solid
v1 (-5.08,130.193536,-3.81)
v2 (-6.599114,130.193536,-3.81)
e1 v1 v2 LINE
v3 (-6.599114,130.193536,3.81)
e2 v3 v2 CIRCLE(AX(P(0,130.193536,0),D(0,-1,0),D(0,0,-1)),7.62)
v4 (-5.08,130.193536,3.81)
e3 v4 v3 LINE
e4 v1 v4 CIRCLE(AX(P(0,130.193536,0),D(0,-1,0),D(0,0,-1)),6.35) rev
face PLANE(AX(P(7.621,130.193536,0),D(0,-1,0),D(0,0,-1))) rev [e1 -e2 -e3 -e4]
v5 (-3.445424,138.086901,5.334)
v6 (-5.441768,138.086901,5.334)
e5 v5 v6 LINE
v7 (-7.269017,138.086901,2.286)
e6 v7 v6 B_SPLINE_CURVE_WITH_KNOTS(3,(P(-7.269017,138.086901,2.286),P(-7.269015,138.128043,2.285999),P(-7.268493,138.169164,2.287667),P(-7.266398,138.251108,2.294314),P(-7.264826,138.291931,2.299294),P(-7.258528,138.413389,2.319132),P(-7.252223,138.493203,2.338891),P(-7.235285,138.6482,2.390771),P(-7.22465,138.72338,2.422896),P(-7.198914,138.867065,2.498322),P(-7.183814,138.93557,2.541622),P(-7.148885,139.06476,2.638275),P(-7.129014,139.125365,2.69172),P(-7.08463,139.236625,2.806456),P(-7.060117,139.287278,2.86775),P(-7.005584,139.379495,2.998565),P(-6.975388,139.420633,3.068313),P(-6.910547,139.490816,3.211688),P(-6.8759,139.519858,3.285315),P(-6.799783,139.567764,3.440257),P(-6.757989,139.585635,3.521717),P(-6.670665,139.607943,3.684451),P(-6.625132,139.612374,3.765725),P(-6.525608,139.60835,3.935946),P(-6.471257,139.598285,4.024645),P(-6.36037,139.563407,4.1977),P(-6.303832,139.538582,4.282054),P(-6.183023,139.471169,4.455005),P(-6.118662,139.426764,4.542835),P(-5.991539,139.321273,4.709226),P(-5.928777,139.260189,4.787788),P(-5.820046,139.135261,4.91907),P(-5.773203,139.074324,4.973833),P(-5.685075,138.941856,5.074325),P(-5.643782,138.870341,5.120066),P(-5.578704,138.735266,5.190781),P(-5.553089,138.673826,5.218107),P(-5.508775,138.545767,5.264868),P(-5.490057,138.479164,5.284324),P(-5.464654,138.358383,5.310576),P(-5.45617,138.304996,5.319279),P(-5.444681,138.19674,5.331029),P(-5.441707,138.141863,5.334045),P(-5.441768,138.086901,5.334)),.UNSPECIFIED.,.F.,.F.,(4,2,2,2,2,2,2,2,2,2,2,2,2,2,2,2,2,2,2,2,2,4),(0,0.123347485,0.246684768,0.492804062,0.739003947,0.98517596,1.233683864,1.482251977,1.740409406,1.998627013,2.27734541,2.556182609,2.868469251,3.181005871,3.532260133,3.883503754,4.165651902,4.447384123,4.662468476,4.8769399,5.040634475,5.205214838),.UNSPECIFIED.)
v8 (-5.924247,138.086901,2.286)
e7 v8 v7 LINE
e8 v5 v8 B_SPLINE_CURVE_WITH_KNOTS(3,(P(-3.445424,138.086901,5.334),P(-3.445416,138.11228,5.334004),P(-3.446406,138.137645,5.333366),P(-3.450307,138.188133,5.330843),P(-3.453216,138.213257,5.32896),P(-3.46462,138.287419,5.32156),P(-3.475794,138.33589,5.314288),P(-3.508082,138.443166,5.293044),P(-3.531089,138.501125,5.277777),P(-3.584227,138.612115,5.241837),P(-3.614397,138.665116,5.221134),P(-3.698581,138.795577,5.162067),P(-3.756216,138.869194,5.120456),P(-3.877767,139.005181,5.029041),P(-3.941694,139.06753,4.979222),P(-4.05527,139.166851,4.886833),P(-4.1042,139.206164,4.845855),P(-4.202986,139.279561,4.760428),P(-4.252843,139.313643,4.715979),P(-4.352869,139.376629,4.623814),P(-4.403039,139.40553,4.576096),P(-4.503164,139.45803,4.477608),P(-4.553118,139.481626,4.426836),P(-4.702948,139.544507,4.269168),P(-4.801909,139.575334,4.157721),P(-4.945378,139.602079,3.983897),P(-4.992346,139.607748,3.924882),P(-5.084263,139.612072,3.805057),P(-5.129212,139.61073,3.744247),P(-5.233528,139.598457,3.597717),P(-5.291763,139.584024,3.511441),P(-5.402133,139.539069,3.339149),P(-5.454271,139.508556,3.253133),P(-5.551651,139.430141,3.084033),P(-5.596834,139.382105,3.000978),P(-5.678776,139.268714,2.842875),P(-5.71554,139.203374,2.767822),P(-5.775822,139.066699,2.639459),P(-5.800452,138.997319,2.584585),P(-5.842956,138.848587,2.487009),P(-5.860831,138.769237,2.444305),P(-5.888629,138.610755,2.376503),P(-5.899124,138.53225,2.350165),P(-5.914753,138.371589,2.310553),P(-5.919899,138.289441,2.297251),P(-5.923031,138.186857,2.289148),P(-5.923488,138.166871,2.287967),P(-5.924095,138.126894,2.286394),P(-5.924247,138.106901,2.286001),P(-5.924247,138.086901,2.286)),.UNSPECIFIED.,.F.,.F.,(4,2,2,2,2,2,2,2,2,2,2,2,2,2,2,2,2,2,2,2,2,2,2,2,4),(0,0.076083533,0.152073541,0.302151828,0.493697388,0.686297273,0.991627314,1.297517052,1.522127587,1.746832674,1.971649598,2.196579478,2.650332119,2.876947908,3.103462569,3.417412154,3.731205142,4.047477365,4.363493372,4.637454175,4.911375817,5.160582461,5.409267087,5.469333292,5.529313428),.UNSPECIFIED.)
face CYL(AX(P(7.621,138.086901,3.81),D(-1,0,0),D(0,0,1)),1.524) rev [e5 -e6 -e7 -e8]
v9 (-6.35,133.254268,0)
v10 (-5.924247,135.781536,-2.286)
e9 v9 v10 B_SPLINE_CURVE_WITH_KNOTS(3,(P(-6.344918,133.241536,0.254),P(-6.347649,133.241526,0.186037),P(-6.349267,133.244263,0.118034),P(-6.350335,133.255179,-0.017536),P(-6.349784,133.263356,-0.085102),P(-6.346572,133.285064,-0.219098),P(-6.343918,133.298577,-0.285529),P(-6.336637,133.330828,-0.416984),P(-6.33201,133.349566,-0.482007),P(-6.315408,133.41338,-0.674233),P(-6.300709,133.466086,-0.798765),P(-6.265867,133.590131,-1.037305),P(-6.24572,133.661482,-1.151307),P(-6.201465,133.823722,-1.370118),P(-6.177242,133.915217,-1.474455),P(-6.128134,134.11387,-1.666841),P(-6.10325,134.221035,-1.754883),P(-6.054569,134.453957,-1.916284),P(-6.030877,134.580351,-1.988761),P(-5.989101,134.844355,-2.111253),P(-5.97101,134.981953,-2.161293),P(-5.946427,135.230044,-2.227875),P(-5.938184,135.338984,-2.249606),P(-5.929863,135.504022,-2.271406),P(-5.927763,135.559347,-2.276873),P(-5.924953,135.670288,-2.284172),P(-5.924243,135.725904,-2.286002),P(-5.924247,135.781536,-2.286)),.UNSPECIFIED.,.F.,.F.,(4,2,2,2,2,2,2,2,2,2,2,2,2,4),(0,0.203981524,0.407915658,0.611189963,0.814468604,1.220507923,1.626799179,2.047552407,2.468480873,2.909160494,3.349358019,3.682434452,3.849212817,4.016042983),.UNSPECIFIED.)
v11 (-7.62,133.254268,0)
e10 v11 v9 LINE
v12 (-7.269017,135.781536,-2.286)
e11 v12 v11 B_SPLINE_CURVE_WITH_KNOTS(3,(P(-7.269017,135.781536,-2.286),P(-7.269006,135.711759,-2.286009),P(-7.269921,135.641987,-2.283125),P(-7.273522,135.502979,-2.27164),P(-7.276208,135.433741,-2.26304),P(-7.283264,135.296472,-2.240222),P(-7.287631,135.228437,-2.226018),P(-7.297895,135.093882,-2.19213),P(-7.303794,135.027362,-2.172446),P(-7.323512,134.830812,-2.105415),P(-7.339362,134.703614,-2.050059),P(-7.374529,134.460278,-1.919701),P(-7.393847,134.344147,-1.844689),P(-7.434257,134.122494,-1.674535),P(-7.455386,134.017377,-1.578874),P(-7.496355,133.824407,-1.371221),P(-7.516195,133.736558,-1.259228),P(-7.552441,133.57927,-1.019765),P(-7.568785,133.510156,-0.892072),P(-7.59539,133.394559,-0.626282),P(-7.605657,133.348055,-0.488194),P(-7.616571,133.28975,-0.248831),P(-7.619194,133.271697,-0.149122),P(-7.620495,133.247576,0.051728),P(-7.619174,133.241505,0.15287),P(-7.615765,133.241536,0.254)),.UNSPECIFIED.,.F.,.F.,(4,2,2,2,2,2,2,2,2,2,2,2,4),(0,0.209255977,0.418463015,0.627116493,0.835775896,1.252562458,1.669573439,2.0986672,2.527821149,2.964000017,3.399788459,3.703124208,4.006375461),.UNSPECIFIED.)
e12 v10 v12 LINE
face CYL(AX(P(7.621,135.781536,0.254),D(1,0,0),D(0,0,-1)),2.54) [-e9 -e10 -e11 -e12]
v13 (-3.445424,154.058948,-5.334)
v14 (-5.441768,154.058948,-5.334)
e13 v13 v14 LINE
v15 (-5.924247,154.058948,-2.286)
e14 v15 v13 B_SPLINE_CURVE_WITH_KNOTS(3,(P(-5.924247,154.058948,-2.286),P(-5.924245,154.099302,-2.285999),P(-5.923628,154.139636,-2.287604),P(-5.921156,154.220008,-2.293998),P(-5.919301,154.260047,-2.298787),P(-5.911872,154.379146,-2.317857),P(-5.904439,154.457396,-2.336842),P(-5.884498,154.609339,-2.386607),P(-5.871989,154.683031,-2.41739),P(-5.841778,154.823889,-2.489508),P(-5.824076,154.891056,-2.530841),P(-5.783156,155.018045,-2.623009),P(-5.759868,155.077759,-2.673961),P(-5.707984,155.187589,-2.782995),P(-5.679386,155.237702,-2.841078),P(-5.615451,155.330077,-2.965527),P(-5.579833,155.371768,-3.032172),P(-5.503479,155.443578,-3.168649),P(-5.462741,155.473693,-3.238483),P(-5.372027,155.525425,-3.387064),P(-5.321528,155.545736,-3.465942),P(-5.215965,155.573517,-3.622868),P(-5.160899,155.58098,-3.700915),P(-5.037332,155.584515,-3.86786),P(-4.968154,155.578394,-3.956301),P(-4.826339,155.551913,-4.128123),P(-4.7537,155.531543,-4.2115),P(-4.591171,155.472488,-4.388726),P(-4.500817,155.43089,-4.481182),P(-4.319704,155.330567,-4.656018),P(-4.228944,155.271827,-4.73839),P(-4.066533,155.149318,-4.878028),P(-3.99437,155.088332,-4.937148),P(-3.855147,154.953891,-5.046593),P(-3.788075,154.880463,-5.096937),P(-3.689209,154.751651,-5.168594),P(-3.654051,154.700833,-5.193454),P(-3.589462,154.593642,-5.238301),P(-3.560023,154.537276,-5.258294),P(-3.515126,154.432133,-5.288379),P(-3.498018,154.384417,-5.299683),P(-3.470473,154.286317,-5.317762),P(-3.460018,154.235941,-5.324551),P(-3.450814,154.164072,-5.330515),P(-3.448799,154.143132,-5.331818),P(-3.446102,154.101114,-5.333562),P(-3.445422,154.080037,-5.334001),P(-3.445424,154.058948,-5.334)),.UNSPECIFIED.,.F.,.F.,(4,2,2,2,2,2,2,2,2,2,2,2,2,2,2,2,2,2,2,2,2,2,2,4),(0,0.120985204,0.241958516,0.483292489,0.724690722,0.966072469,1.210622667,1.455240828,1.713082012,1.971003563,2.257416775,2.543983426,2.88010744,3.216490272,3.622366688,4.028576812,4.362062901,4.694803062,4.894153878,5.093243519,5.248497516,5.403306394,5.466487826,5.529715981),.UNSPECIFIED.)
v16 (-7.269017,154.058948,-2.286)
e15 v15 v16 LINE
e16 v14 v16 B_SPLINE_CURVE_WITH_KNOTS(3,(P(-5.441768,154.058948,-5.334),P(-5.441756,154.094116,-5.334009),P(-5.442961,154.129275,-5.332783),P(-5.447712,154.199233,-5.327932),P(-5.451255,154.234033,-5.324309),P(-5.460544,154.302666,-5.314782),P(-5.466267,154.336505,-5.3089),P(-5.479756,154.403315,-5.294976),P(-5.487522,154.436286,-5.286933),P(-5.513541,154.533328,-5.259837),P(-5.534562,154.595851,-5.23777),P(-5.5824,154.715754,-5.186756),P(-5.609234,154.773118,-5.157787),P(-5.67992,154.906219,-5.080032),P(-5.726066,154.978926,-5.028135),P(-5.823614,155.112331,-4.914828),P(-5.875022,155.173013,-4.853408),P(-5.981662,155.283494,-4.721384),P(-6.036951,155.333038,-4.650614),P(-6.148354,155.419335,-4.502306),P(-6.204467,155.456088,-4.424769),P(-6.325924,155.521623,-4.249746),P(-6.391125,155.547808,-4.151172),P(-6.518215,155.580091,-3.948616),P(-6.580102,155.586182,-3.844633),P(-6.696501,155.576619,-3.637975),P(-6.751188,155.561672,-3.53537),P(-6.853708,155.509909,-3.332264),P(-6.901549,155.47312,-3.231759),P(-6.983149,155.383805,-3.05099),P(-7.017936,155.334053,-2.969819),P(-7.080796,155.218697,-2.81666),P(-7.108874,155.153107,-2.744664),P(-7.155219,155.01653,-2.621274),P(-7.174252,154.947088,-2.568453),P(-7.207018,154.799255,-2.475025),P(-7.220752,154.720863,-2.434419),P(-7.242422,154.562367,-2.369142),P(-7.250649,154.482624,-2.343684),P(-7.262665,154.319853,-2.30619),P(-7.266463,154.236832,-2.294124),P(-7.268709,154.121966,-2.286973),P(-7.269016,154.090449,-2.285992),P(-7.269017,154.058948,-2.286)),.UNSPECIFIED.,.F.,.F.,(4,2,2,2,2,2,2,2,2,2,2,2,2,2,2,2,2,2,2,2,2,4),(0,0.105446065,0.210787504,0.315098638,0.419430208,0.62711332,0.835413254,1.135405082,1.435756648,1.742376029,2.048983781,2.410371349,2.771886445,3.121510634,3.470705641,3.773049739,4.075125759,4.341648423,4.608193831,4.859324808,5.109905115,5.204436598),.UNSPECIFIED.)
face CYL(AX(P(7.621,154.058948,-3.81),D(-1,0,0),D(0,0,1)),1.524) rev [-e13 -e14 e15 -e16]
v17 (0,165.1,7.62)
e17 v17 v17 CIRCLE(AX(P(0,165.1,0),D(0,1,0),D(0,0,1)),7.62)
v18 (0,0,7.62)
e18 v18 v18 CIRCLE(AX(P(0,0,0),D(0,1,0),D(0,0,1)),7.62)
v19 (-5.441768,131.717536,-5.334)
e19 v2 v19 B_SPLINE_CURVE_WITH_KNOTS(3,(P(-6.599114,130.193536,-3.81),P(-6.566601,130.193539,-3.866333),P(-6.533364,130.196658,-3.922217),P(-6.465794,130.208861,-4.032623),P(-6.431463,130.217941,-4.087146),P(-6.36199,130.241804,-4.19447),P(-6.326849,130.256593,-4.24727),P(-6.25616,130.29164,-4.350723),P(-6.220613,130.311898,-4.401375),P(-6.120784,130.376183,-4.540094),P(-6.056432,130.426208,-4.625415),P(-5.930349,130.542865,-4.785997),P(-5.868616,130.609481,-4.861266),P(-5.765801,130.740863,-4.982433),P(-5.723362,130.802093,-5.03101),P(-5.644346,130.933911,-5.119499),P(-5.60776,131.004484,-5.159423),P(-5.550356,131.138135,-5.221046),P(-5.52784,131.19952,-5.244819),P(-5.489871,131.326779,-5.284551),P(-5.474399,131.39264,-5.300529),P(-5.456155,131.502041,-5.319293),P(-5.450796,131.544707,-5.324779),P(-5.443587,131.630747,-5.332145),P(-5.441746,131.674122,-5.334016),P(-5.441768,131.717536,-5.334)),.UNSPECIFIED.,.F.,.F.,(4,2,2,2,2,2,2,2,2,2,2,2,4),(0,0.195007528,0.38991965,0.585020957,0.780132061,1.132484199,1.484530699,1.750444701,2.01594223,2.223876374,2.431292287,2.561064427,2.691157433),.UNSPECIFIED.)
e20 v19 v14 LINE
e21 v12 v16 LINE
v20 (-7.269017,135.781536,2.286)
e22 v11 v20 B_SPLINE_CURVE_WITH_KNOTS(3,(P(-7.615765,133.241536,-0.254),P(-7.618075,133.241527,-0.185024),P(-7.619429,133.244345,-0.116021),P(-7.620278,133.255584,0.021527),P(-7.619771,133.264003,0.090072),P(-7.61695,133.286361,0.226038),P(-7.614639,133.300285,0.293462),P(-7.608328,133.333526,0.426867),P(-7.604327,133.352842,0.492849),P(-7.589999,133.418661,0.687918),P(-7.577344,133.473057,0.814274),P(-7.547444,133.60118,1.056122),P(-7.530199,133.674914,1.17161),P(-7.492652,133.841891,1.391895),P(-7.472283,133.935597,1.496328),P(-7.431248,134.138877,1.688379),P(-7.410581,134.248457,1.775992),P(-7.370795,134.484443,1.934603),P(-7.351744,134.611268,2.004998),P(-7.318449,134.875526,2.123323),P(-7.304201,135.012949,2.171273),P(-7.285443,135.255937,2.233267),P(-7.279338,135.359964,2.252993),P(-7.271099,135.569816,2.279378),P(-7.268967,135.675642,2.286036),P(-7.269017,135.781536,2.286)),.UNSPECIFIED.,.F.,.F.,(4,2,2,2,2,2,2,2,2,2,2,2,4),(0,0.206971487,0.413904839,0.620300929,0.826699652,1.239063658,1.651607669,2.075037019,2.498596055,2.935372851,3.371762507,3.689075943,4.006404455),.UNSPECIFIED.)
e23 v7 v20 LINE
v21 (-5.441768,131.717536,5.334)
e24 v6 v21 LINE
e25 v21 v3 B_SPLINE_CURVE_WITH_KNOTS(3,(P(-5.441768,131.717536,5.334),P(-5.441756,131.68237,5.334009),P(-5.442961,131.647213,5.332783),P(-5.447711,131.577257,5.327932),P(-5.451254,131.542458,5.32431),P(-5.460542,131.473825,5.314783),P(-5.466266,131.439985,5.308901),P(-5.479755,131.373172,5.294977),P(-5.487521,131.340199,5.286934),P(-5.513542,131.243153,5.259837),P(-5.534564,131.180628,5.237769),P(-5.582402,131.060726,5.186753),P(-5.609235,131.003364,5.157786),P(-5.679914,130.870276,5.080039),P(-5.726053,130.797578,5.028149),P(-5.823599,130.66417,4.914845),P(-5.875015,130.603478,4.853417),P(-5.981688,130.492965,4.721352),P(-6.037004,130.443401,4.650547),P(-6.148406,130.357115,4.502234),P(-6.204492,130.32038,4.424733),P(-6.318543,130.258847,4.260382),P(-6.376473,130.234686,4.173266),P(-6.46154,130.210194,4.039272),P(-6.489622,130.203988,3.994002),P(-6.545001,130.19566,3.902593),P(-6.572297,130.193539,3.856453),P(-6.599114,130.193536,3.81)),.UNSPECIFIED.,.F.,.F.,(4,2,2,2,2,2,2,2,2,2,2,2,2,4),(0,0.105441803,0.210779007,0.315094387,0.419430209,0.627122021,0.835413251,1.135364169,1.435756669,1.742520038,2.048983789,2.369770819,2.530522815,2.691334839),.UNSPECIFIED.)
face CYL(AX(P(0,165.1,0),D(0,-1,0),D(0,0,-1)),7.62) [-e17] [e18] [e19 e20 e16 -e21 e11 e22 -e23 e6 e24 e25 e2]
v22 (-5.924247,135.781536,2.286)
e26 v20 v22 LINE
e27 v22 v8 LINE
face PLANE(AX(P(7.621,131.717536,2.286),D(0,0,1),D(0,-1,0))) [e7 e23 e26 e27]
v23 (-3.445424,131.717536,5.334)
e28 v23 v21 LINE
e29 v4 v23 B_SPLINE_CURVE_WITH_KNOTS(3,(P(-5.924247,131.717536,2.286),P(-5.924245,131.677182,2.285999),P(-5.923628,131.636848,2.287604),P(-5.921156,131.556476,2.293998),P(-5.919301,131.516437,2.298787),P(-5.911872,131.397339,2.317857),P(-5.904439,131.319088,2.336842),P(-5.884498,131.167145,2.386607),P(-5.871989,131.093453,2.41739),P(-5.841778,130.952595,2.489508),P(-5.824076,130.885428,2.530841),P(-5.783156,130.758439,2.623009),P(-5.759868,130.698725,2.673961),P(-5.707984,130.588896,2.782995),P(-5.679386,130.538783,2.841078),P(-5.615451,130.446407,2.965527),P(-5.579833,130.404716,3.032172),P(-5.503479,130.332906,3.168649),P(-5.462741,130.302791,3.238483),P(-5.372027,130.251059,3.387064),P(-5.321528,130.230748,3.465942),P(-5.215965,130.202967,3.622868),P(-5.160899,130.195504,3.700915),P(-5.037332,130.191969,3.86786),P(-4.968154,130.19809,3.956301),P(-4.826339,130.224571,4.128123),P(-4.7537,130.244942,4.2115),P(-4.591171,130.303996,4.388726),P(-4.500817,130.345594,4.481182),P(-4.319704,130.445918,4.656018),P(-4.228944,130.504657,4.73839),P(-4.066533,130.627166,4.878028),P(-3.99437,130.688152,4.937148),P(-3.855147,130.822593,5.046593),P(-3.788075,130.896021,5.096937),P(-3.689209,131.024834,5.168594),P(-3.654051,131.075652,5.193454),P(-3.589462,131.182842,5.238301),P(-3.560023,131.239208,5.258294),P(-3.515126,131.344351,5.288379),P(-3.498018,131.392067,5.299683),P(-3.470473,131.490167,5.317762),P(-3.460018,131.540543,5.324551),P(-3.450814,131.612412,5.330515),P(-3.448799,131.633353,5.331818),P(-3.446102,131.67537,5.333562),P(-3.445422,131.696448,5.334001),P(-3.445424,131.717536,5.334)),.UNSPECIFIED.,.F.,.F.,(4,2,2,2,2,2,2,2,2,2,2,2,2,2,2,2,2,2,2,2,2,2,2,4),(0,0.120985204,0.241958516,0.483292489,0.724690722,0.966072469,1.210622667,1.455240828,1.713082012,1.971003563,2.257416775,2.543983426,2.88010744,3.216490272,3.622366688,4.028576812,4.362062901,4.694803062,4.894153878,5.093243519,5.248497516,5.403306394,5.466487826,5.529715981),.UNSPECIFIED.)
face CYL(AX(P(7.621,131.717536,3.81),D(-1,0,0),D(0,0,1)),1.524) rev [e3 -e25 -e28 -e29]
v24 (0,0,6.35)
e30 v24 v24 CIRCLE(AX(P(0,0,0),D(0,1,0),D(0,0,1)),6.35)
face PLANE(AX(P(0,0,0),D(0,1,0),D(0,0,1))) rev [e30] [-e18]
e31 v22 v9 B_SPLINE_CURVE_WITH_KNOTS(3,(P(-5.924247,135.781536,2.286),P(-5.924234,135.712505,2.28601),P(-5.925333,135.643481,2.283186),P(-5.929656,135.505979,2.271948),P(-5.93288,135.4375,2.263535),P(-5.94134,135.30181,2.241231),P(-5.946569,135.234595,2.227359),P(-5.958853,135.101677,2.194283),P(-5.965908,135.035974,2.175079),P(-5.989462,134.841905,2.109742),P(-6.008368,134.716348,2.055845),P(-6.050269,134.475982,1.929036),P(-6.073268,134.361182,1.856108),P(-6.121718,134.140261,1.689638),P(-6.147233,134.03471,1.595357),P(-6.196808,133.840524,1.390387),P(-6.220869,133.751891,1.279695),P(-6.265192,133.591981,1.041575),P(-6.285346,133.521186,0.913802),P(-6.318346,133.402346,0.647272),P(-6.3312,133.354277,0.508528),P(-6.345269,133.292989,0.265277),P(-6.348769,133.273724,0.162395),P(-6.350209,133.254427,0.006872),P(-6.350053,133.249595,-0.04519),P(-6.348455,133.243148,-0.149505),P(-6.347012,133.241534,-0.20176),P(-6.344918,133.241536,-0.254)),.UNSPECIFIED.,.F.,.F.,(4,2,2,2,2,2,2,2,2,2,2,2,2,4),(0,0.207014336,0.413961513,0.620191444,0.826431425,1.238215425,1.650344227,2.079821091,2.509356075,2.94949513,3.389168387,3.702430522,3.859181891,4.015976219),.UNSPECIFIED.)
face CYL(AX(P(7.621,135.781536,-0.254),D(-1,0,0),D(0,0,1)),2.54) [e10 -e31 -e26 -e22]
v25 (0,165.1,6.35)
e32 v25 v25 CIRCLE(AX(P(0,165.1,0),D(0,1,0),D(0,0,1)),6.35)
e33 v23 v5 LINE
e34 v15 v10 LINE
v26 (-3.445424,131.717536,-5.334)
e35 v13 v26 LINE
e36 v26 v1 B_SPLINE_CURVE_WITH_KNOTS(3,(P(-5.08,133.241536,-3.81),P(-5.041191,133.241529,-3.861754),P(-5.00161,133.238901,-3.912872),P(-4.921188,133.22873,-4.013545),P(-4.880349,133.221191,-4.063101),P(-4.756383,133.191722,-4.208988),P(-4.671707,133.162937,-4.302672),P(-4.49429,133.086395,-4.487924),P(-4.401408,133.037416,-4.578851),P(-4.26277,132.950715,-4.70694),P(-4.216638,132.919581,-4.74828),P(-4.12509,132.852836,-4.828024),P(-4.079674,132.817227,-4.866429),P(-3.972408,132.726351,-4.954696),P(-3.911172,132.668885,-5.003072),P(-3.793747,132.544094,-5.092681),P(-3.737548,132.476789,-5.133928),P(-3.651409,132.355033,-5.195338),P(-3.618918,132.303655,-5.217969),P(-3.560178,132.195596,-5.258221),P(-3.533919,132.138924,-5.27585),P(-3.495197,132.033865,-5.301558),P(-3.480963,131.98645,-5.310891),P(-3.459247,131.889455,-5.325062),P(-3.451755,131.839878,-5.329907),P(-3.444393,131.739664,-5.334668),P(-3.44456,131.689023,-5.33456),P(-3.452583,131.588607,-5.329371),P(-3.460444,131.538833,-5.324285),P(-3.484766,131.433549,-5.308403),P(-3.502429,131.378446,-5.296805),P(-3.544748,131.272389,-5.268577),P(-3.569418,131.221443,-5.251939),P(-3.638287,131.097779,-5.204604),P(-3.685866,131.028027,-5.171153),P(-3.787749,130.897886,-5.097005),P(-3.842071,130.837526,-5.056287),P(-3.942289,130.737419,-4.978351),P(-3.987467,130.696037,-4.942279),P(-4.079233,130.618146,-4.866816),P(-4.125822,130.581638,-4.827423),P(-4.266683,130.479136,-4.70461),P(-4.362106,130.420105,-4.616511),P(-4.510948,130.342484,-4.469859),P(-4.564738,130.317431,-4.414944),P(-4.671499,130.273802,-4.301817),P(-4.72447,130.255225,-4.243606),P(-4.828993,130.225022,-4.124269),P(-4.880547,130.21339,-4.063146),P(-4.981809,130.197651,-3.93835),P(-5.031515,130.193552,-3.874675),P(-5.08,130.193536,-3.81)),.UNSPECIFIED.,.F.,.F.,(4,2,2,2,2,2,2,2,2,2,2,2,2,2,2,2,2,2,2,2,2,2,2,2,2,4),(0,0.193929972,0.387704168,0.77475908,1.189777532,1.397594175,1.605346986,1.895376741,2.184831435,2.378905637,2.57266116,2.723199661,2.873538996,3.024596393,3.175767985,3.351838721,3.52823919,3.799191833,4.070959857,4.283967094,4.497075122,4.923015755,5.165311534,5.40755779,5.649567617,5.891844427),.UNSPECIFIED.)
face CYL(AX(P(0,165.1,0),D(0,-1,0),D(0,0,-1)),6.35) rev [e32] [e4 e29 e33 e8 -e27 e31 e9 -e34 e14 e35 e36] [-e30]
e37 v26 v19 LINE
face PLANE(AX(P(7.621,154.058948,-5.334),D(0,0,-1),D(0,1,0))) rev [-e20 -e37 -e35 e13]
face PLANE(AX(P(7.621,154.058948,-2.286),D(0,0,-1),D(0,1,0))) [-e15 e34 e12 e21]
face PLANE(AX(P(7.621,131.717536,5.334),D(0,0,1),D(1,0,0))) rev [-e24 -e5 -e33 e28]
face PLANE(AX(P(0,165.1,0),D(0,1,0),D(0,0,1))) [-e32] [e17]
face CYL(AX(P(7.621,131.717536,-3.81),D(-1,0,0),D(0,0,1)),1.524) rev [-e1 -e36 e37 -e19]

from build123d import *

# Parameters (mm, degrees)
SKETCH1_R               = 7.62
SKETCH1_R_2             = 6.35
BOSS_EXTRUDE1_DEPTH     = 165.1
CUT_EXTRUDE1_REACH      = 167.977
CUT_EXTRUDE1_END_RADIUS = 6.35
FILLET3_R               = 2.54


with BuildPart() as part:
    # Sketch1 → Boss-Extrude1 (new body)
    with BuildSketch(Plane(origin=(0, 0, 0), x_dir=(1, 0, 0), z_dir=(0, 1, 0))):
        with Locations(Location((0, 0, 0), (0, 0, 270))):
            Circle(SKETCH1_R)
        with Locations(Location((0, 0, 0), (0, 0, 270))):
            Circle(SKETCH1_R_2, mode=Mode.SUBTRACT)
    extrude(amount=BOSS_EXTRUDE1_DEPTH)

    # Cut-Extrude1: up to this cylinder (the profile starts outside it)
    cut_extrude1_end = Plane(origin=(0, 137.302889, 0), z_dir=(0, -1, 0)) * Cylinder(CUT_EXTRUDE1_END_RADIUS, 360.824706, mode=Mode.PRIVATE)
    # Sketch2 → Cut-Extrude1 (cut, up to the surface)
    with BuildSketch(Plane.ZY.offset(7.62), mode=Mode.PRIVATE) as cut_extrude1_sk1:
        with BuildLine():
            Line((-2.286, 154.058948498), (-2.286, 131.717535749))
            ThreePointArc((-2.286, 131.717535749), (-3.81, 130.193535749), (-5.334, 131.717535749))
            Line((-5.334, 131.717535749), (-5.334, 154.058948498))
            ThreePointArc((-5.334, 154.058948498), (-3.81, 155.582948498), (-2.286, 154.058948498))
        make_face()
    cut_extrude1_tool1 = extrude(cut_extrude1_sk1.sketch, amount=-CUT_EXTRUDE1_REACH, mode=Mode.PRIVATE) - cut_extrude1_end
    add(cut_extrude1_tool1.solids().sort_by_distance((-7.62, 142.888242, -3.81))[0], mode=Mode.SUBTRACT)
    # Sketch2 → Cut-Extrude1 (cut, up to the surface)
    with BuildSketch(Plane.ZY.offset(7.62), mode=Mode.PRIVATE) as cut_extrude1_sk2:
        with BuildLine():
            Line((2.286, 131.717535749), (2.286, 138.086901397))
            ThreePointArc((2.286, 138.086901397), (3.81, 139.610901397), (5.334, 138.086901397))
            Line((5.334, 138.086901397), (5.334, 131.717535749))
            ThreePointArc((5.334, 131.717535749), (3.81, 130.193535749), (2.286, 131.717535749))
        make_face()
    cut_extrude1_tool2 = extrude(cut_extrude1_sk2.sketch, amount=-CUT_EXTRUDE1_REACH, mode=Mode.PRIVATE) - cut_extrude1_end
    add(cut_extrude1_tool2.solids().sort_by_distance((-7.62, 134.902219, 3.81))[0], mode=Mode.SUBTRACT)
    # Sketch2 → Cut-Extrude1 (cut, up to the surface)
    with BuildSketch(Plane.ZY.offset(7.62), mode=Mode.PRIVATE) as cut_extrude1_sk3:
        with BuildLine():
            Line((-3.81, 133.241535749), (3.81, 133.241535749))
            ThreePointArc((3.81, 133.241535749), (5.334, 131.717535749), (3.81, 130.193535749))
            Line((3.81, 130.193535749), (-3.81, 130.193535749))
            ThreePointArc((-3.81, 130.193535749), (-5.334, 131.717535749), (-3.81, 133.241535749))
        make_face()
    cut_extrude1_tool3 = extrude(cut_extrude1_sk3.sketch, amount=-CUT_EXTRUDE1_REACH, mode=Mode.PRIVATE) - cut_extrude1_end
    add(cut_extrude1_tool3.solids().sort_by_distance((-7.62, 131.717536, 0))[0], mode=Mode.SUBTRACT)

    # Fillet3
    # the kernel refuses this fillet: 2.54 mm, written as the material it takes off along each edge
    with BuildSketch(Plane(origin=(-13.619016715, 133.241535749, 2.286), x_dir=(0, 0, -1), z_dir=(1, 0, 0)), Plane(origin=(0.425752875, 133.241535749, -2.286), x_dir=(0, 0, 1), z_dir=(-1, 0, 0))) as fillet3_piece_1:
        with BuildLine():
            CenterArc((FILLET3_R, FILLET3_R), FILLET3_R, 180, 90)
            Line((0, FILLET3_R), (0, 0))
            Line((0, 0), (FILLET3_R, 0))
        make_face()
    extrude(amount=14.04476959, mode=Mode.SUBTRACT)


solid = part.part
